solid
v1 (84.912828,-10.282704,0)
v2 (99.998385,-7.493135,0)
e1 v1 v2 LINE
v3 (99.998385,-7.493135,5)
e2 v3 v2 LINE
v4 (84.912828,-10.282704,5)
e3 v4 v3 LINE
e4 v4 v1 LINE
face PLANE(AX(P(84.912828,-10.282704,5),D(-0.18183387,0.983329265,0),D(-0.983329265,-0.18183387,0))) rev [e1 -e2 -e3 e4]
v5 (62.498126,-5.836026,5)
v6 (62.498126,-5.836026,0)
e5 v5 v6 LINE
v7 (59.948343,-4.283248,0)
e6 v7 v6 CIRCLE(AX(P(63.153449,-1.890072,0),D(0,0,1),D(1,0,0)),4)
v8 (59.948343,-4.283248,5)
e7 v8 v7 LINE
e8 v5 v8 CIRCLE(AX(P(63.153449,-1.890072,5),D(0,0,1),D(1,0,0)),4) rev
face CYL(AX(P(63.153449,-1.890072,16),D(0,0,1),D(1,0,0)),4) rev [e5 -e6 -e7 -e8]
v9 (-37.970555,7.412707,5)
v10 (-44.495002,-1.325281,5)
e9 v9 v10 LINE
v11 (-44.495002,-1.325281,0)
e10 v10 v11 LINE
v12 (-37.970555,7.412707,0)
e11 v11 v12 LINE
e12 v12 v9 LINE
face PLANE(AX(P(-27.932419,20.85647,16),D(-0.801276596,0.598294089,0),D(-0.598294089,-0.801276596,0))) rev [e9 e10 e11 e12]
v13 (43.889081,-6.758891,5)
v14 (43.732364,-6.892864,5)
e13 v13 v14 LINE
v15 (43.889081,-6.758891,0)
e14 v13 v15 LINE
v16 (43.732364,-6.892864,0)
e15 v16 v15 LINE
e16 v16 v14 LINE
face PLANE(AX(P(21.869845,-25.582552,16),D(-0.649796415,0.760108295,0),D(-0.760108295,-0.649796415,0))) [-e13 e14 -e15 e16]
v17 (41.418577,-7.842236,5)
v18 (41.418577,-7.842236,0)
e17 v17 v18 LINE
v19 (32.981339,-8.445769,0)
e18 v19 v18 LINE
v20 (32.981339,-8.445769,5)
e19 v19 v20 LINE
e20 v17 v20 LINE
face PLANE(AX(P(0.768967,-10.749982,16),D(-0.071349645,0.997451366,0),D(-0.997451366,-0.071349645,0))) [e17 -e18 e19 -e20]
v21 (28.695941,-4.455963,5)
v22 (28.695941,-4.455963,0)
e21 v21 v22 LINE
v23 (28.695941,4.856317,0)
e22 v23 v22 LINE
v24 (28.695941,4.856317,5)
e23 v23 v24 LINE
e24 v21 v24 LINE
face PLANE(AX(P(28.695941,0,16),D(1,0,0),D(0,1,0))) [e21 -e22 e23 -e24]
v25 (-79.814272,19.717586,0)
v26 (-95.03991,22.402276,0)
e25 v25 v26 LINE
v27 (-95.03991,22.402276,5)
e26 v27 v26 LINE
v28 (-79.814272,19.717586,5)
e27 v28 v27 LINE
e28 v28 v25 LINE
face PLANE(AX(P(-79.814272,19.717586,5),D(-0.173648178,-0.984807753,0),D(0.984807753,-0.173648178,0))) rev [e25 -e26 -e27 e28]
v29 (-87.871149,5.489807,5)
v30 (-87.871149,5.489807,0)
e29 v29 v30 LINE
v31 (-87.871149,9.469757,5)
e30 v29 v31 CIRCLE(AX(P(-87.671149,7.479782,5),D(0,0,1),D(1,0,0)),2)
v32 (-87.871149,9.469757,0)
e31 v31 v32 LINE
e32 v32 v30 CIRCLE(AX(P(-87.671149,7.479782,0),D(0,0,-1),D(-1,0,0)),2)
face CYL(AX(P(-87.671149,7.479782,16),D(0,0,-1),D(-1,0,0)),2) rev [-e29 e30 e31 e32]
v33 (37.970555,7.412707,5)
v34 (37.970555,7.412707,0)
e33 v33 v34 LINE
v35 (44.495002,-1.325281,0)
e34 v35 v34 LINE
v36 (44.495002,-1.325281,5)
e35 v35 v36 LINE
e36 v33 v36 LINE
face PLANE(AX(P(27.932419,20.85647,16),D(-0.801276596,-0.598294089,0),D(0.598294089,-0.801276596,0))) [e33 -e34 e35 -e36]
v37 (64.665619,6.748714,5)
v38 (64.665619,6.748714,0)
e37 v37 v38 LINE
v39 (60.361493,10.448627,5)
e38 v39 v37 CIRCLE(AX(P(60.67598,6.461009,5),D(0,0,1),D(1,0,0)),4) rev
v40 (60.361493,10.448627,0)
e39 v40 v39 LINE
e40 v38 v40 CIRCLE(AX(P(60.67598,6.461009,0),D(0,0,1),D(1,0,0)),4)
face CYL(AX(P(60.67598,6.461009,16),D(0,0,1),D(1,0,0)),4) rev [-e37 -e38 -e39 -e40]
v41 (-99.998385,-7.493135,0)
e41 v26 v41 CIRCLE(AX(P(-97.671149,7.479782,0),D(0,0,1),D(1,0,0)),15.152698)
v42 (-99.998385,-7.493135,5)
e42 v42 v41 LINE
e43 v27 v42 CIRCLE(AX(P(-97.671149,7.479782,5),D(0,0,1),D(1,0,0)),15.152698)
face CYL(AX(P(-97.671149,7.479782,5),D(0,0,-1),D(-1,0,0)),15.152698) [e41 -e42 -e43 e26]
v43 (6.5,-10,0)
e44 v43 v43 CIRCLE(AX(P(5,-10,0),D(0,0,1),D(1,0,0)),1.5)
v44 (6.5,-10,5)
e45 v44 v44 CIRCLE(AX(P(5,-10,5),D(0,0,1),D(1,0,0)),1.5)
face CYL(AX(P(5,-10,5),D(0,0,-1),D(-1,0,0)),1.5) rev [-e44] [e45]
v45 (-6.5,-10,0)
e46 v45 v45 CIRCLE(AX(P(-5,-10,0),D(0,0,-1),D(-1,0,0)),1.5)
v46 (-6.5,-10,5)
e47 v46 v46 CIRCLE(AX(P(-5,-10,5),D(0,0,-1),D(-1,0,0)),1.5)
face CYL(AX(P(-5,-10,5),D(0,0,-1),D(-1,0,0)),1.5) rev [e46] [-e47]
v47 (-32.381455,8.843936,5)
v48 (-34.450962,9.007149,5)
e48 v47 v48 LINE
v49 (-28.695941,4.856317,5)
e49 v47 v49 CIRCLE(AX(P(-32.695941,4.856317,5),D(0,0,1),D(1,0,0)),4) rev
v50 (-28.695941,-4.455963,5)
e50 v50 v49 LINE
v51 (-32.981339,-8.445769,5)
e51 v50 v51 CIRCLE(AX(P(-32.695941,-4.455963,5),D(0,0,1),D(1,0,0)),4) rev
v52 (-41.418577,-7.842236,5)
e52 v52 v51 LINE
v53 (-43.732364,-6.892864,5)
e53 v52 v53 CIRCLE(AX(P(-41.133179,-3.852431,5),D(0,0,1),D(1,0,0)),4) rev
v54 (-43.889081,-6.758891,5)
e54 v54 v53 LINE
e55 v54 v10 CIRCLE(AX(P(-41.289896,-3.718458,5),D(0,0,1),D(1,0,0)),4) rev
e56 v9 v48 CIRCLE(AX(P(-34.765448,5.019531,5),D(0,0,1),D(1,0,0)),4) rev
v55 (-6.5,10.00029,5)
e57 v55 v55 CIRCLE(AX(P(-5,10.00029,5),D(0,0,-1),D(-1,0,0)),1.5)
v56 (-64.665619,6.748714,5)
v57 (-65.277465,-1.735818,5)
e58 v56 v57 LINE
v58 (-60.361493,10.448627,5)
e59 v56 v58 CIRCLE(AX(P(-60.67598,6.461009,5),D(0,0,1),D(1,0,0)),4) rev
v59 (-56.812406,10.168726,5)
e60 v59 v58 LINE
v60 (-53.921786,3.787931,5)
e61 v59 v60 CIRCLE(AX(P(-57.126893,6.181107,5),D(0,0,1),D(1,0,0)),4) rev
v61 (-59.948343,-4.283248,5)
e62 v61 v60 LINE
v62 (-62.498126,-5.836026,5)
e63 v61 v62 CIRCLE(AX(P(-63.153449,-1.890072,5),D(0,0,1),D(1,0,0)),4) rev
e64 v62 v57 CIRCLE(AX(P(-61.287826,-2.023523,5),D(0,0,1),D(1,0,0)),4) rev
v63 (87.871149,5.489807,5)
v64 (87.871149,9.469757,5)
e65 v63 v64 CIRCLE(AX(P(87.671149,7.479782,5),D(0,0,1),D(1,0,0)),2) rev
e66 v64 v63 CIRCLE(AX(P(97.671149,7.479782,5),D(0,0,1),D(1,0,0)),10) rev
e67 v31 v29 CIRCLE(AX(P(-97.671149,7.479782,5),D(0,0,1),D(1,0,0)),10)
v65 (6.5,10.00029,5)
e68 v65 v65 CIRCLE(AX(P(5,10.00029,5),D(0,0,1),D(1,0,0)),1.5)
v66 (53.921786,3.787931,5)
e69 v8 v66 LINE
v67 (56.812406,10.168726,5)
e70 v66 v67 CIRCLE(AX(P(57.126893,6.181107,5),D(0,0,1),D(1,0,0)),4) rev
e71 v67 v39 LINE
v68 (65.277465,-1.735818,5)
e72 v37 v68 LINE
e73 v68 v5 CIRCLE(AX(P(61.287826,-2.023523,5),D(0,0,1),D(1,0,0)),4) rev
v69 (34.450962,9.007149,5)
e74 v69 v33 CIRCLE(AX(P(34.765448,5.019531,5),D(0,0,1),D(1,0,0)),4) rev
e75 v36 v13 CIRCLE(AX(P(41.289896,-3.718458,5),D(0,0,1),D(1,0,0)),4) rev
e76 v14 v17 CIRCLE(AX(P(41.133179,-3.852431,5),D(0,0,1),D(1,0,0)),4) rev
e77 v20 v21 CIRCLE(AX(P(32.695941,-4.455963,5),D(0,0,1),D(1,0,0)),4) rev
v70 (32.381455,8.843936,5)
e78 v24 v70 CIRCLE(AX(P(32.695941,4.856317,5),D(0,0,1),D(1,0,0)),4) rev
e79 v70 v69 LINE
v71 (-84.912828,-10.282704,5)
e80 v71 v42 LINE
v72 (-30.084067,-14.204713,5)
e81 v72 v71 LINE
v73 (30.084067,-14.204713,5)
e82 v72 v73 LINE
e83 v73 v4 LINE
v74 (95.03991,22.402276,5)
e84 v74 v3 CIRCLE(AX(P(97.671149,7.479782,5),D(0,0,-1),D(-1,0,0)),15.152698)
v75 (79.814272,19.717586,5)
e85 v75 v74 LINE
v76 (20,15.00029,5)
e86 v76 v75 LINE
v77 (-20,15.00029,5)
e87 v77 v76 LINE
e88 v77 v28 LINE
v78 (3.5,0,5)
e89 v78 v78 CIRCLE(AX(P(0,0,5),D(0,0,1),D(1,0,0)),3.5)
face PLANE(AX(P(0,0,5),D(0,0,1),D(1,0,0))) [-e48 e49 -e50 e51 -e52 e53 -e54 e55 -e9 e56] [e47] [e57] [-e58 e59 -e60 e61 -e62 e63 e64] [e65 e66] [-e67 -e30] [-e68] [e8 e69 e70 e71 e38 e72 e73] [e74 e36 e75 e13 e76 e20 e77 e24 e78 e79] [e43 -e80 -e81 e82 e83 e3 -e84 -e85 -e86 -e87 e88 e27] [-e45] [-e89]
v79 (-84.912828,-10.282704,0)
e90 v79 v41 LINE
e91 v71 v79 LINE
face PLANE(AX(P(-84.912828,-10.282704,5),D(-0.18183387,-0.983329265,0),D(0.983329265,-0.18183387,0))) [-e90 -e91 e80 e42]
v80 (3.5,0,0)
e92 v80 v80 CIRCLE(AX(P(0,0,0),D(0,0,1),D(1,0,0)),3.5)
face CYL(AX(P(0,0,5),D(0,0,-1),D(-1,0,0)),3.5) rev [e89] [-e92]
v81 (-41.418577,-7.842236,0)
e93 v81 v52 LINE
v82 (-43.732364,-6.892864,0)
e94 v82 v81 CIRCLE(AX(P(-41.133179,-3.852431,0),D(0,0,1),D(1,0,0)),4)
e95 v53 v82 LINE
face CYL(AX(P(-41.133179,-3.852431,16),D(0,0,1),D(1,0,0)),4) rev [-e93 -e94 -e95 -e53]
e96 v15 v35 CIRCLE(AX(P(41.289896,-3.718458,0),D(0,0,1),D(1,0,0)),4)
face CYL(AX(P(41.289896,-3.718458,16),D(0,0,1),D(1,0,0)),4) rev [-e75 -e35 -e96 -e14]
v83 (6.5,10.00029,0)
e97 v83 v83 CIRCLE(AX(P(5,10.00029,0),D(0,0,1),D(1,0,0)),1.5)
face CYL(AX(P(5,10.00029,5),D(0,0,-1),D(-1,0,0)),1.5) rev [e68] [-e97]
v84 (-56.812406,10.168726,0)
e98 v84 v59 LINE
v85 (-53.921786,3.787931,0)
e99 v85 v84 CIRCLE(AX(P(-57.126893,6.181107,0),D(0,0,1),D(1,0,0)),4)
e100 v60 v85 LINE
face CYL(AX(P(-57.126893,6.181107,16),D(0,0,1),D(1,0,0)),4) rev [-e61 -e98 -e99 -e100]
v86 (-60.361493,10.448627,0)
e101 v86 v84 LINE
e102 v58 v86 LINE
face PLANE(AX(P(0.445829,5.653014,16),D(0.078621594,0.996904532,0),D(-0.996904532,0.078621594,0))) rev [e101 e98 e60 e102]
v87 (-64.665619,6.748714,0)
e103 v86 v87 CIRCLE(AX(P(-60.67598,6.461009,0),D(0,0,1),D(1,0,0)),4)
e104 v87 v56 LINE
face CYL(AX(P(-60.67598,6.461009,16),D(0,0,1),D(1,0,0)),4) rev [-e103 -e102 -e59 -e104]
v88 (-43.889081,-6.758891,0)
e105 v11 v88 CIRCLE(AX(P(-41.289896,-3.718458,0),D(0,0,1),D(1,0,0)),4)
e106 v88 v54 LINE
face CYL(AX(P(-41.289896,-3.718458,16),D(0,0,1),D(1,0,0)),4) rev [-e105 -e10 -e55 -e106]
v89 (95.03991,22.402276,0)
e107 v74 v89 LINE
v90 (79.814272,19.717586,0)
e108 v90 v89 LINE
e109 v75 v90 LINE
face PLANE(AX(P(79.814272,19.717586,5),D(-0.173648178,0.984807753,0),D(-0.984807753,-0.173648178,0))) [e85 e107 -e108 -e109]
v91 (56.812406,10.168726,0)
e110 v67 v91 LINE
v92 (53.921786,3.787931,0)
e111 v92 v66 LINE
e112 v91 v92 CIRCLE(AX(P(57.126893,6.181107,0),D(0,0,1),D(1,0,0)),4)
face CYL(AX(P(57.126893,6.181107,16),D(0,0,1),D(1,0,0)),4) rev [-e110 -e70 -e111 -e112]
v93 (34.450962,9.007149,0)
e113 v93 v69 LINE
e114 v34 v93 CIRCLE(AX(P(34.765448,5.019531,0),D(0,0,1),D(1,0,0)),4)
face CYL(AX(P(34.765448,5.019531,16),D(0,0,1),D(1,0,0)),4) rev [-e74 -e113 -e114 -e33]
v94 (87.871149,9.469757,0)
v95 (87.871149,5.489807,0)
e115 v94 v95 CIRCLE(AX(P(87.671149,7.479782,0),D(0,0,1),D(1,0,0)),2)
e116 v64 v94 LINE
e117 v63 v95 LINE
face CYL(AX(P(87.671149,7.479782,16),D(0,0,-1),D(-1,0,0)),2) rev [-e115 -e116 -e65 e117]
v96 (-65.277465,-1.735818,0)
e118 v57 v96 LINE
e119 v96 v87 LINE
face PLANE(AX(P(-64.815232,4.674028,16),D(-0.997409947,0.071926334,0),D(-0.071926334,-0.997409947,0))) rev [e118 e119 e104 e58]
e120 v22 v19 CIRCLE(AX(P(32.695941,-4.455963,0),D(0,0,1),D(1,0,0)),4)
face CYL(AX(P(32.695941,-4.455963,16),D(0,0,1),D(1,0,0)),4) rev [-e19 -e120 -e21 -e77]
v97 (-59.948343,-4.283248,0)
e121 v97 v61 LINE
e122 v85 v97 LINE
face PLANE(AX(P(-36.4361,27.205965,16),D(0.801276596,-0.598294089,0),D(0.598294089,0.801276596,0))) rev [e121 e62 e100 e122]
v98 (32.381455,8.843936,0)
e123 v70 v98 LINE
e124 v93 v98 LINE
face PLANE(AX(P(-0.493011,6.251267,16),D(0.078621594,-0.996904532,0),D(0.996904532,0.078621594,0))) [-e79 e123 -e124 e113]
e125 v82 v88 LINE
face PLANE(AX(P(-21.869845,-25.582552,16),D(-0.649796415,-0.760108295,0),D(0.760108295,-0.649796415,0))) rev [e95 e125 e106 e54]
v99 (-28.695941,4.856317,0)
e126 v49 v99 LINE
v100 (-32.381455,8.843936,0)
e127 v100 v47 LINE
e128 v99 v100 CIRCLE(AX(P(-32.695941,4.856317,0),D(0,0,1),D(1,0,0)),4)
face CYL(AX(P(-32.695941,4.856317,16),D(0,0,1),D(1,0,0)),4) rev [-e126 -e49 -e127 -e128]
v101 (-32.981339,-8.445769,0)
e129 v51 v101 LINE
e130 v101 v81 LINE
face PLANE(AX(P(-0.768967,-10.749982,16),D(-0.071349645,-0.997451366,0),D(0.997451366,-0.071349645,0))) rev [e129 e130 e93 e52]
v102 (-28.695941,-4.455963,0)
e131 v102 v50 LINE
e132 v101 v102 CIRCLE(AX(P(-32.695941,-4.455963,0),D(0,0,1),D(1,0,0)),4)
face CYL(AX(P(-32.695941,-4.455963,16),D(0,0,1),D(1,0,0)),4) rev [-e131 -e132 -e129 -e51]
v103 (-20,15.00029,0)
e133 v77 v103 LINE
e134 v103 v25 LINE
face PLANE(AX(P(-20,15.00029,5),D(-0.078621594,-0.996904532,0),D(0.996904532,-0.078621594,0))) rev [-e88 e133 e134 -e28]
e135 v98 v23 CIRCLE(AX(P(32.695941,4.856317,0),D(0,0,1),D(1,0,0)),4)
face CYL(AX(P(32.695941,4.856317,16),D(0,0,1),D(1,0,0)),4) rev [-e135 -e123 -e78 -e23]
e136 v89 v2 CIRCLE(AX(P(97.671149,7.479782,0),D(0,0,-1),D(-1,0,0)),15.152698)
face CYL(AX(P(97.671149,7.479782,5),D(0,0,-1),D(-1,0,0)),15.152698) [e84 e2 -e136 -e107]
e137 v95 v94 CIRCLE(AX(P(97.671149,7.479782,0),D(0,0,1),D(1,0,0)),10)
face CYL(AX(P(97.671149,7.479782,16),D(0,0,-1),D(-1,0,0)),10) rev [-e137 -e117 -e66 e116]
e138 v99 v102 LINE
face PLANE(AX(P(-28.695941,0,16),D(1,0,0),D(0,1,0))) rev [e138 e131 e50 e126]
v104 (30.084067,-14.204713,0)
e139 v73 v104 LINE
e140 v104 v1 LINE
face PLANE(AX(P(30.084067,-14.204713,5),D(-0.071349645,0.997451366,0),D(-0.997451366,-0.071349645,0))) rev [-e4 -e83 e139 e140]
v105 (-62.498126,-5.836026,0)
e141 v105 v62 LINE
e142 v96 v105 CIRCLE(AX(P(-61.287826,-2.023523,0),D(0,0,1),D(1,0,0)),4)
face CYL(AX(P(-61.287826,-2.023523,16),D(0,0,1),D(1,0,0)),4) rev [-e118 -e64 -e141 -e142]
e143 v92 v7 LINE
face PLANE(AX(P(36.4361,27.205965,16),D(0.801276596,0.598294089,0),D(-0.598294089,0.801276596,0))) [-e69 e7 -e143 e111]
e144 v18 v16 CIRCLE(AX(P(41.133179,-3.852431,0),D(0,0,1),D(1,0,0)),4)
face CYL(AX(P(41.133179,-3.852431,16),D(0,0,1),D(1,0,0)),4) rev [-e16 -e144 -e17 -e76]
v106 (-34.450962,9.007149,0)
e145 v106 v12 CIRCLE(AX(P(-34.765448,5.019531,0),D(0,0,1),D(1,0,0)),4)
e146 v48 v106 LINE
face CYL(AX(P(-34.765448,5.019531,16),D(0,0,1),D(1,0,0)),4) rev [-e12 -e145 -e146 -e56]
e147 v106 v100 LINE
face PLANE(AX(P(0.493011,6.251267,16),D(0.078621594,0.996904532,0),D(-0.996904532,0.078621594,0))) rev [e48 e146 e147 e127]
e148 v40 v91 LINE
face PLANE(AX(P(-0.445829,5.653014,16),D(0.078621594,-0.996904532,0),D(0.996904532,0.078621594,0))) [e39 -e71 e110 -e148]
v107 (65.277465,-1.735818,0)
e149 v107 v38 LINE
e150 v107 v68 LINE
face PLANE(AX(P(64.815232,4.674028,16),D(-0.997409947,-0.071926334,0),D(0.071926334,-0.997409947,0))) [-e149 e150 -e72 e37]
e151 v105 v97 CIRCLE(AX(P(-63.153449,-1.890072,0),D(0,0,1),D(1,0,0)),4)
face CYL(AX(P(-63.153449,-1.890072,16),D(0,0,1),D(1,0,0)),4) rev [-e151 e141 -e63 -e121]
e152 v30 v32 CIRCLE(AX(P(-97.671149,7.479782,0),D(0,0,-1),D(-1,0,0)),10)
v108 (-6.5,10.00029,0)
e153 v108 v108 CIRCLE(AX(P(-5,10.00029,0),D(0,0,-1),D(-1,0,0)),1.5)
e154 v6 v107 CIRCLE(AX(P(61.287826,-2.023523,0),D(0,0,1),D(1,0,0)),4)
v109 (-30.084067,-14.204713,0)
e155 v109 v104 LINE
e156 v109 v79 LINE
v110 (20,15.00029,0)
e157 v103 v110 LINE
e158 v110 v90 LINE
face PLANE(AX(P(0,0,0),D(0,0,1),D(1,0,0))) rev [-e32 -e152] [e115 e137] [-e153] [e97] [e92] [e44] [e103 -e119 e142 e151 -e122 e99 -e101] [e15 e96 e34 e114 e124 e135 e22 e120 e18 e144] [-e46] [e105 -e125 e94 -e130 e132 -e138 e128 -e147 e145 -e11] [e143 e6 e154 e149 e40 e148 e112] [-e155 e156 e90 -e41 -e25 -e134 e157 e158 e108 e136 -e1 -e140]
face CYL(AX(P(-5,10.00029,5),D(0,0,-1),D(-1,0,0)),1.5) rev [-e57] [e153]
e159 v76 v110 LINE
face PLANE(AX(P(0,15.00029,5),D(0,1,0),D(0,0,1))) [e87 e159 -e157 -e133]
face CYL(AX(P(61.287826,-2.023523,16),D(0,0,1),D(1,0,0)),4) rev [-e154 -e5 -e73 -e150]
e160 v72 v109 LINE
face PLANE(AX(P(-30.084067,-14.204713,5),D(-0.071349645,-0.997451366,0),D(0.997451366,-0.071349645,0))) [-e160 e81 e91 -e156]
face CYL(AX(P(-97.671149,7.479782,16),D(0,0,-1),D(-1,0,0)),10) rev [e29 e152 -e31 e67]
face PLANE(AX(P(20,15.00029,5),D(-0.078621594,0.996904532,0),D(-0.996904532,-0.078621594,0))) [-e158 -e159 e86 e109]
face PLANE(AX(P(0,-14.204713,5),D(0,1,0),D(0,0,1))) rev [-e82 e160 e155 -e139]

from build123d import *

# Parameters (mm, degrees)
IZIM1_R                     = 1.5
Y_KSEKLIK_EKSTR_ZYON3_DEPTH = 5
KES_EKSTR_ZYON3_DEPTH       = 16
RADYUS1_R                   = 4
RADYUS1_OF_AYNALAMA1_R      = 4


with BuildPart() as part:
    # Çizim1 → Yükseklik-Ekstrüzyon3 (new body)
    with BuildSketch(Plane.XY):
        with BuildLine():
            Line((0, 15.000289945), (20, 15.000289945))
            Line((20, 15.000289945), (79.814271892, 19.717585574))
            Line((79.814271892, 19.717585574), (95.039910294, 22.402276423))
            ThreePointArc((95.039910294, 22.402276423), (112.619627342, 9.95914701), (99.998384592, -7.493135147))
            Line((99.998384592, -7.493135147), (84.9128284, -10.282704371))
            Line((84.9128284, -10.282704371), (30.084066985, -14.204712795))
            Line((30.084066985, -14.204712795), (0, -14.204712795))
            Line((0, -14.204712795), (0, -3.5))
            ThreePointArc((0, -3.5), (3.5, 0), (0, 3.5))
            Line((0, 3.5), (0, 15.000289945))
        make_face()
        with Locations((5, 10.000289945)):
            Circle(IZIM1_R, mode=Mode.SUBTRACT)
        with Locations((5, -10)):
            Circle(IZIM1_R, mode=Mode.SUBTRACT)
    y_kseklik_ekstr_zyon3 = extrude(amount=Y_KSEKLIK_EKSTR_ZYON3_DEPTH)

    # Çizim2 → Kes-Ekstrüzyon3 (cut)
    with BuildSketch(Plane.XY):
        with BuildLine():
            ThreePointArc((87.871148736, 5.489806807), (107.671148736, 7.479781681), (87.871148736, 9.469756555))
            ThreePointArc((87.871148736, 9.469756555), (85.671148736, 7.479781681), (87.871148736, 5.489806807))
        make_face()
        Polygon((65.565337221, -5.727765324), (64.37597588, 10.765231948), (49.583112015, 9.598582086), (61.257040732, -6.035946189), align=None)
        Polygon((42.731699056, -7.748306299), (46.735341753, -4.32569838), (36.65049886, 9.180616861), (28.695940883, 8.553274918), (28.695940883, -8.752311503), align=None)
    kes_ekstr_zyon3 = extrude(amount=KES_EKSTR_ZYON3_DEPTH, mode=Mode.SUBTRACT)

    # Radyus1
    # the kernel refuses this fillet: 4 mm, written as the material it adds along each edge
    with BuildSketch(Plane(origin=(28.695940883, -8.752311503, 0), x_dir=(0.9974513663147316, 0.07134964496670468, 0), z_dir=(0, 0, 1))) as radyus1_piece_1:
        with BuildLine():
            CenterArc((RADYUS1_R * 1.07408709953, RADYUS1_R), RADYUS1_R, 175.908489963, 94.091510037)
            Line((RADYUS1_R * 0.0766357332147, RADYUS1_R * 1.07134964497), (0, 0))
            Line((0, 0), (RADYUS1_R * 1.07408709953, 0))
        make_face()
    extrude(amount=5)
    with BuildSketch(Plane(origin=(64.37597588, 10.765231948, 0), x_dir=(-0.9969045315308735, -0.0786215938099059, 0), z_dir=(0, 0, 1))) as radyus1_piece_2:
        with BuildLine():
            CenterArc((RADYUS1_R * 1.0067369642, RADYUS1_R), RADYUS1_R, 179.615297698, 90.384702302)
            Line((RADYUS1_R * 0.00675950517271, RADYUS1_R * 1.00671427137), (0, 0))
            Line((0, 0), (RADYUS1_R * 1.0067369642, 0))
        make_face()
    extrude(amount=5)
    with BuildSketch(Plane(origin=(49.583112015, 9.598582086, 0), x_dir=(0.5982940894650635, -0.8012765955094225, 0), z_dir=(0, 0, 1))) as radyus1_piece_3:
        with BuildLine():
            CenterArc((RADYUS1_R * 1.81293545135, RADYUS1_R), RADYUS1_R, 147.761521051, 122.238478949)
            Line((RADYUS1_R * 0.967100347397, RADYUS1_R * 1.53344444595), (0, 0))
            Line((0, 0), (RADYUS1_R * 1.81293545135, 0))
        make_face()
    extrude(amount=5)
    with BuildSketch(Plane(origin=(65.565337221, -5.727765324, 0), x_dir=(-0.9974513663147317, -0.07134964496670451, 0), z_dir=(0, 0, 1))) as radyus1_piece_4:
        with BuildLine():
            CenterArc((RADYUS1_R * 1.0005783418, -RADYUS1_R), RADYUS1_R, 90, 90.033126964)
            Line((RADYUS1_R * 0.000578508947597, -RADYUS1_R * 1.00057817457), (0, 0))
            Line((0, 0), (RADYUS1_R * 1.0005783418, 0))
        make_face()
    extrude(amount=5)
    with BuildSketch(Plane(origin=(46.735341753, -4.32569838, 0), x_dir=(-0.5982940894650634, 0.8012765955094225, 0), z_dir=(0, 0, 1))) as radyus1_piece_5:
        with BuildLine():
            CenterArc((RADYUS1_R * 0.936136482984, RADYUS1_R), RADYUS1_R, 183.778435906, 86.221564094)
            Line((-RADYUS1_R * 0.0616898577771, RADYUS1_R * 0.934101641269), (0, 0))
            Line((0, 0), (RADYUS1_R * 0.936136482984, 0))
        make_face()
    extrude(amount=5)
    with BuildSketch(Plane(origin=(36.65049886, 9.180616861, 0), x_dir=(-0.9969045315308735, -0.07862159380990552, 0), z_dir=(0, 0, 1))) as radyus1_piece_6:
        with BuildLine():
            CenterArc((RADYUS1_R * 0.551591618585, RADYUS1_R), RADYUS1_R, 212.238478949, 57.761521051)
            Line((-RADYUS1_R * 0.294243485369, RADYUS1_R * 0.466555554046), (0, 0))
            Line((0, 0), (RADYUS1_R * 0.551591618585, 0))
        make_face()
    extrude(amount=5)
    with BuildSketch(Plane(origin=(28.695940883, 8.553274918, 0), x_dir=(0, -1, 0), z_dir=(0, 0, 1))) as radyus1_piece_7:
        with BuildLine():
            CenterArc((RADYUS1_R * 0.924239359987, RADYUS1_R), RADYUS1_R, 184.509339304, 85.490660696)
            Line((-RADYUS1_R * 0.072665171544, RADYUS1_R * 0.92137840619), (0, 0))
            Line((0, 0), (RADYUS1_R * 0.924239359987, 0))
        make_face()
    extrude(amount=5)
    with BuildSketch(Plane(origin=(42.731699056, -7.748306299, 0), x_dir=(-0.9974513663147319, -0.07134964496670451, 0), z_dir=(0, 0, 1))) as radyus1_piece_8:
        with BuildLine():
            CenterArc((RADYUS1_R * 0.32911927964, -RADYUS1_R), RADYUS1_R, 90, 36.434744123)
            Line((-RADYUS1_R * 0.26478758489, -RADYUS1_R * 0.195466199427), (0, 0))
            Line((0, 0), (RADYUS1_R * 0.32911927964, 0))
        make_face()
    extrude(amount=5)
    with BuildSketch(Plane(origin=(61.257040732, -6.035946189, 0), x_dir=(0.9974513663147319, 0.07134964496670383, 0), z_dir=(0, 0, 1))) as radyus1_piece_9:
        with BuildLine():
            CenterArc((RADYUS1_R * 0.546845511805, RADYUS1_R), RADYUS1_R, 212.656308216, 57.343691784)
            Line((-RADYUS1_R * 0.295076994051, RADYUS1_R * 0.460401543615), (0, 0))
            Line((0, 0), (RADYUS1_R * 0.546845511805, 0))
        make_face()
    extrude(amount=5)

    # Aynalama1: Yükseklik-Ekstrüzyon3, Kes-Ekstrüzyon3 across plane
    add(y_kseklik_ekstr_zyon3.mirror(Plane(origin=(0, 0, 0), x_dir=(0, 0, 1), z_dir=(1, 0, 0))))
    add(kes_ekstr_zyon3.mirror(Plane(origin=(0, 0, 0), x_dir=(0, 0, 1), z_dir=(1, 0, 0))), mode=Mode.SUBTRACT)

    # Radyus1 of Aynalama1
    # the kernel refuses this fillet: 4 mm, written as the material it adds along each edge
    with BuildSketch(Plane(origin=(-28.695940883, -8.752311503, 0), x_dir=(0, 1, 0), z_dir=(0, 0, 1))) as radyus1_of_aynalama1_piece_1:
        with BuildLine():
            CenterArc((RADYUS1_OF_AYNALAMA1_R * 1.07408709953, RADYUS1_OF_AYNALAMA1_R), RADYUS1_OF_AYNALAMA1_R, 175.908489963, 94.091510037)
            Line((RADYUS1_OF_AYNALAMA1_R * 0.0766357332147, RADYUS1_OF_AYNALAMA1_R * 1.07134964497), (0, 0))
            Line((0, 0), (RADYUS1_OF_AYNALAMA1_R * 1.07408709953, 0))
        make_face()
    extrude(amount=5)
    with BuildSketch(Plane(origin=(-64.37597588, 10.765231948, 0), x_dir=(-0.0719263340510189, -0.9974099470478431, 0), z_dir=(0, 0, 1))) as radyus1_of_aynalama1_piece_2:
        with BuildLine():
            CenterArc((RADYUS1_OF_AYNALAMA1_R * 1.0067369642, RADYUS1_OF_AYNALAMA1_R), RADYUS1_OF_AYNALAMA1_R, 179.615297698, 90.384702302)
            Line((RADYUS1_OF_AYNALAMA1_R * 0.00675950517271, RADYUS1_OF_AYNALAMA1_R * 1.00671427137), (0, 0))
            Line((0, 0), (RADYUS1_OF_AYNALAMA1_R * 1.0067369642, 0))
        make_face()
    extrude(amount=5)
    with BuildSketch(Plane(origin=(-49.583112015, 9.598582086, 0), x_dir=(-0.9969045315308733, 0.07862159380990602, 0), z_dir=(0, 0, 1))) as radyus1_of_aynalama1_piece_3:
        with BuildLine():
            CenterArc((RADYUS1_OF_AYNALAMA1_R * 1.81293545135, RADYUS1_OF_AYNALAMA1_R), RADYUS1_OF_AYNALAMA1_R, 147.761521051, 122.238478949)
            Line((RADYUS1_OF_AYNALAMA1_R * 0.967100347397, RADYUS1_OF_AYNALAMA1_R * 1.53344444595), (0, 0))
            Line((0, 0), (RADYUS1_OF_AYNALAMA1_R * 1.81293545135, 0))
        make_face()
    extrude(amount=5)
    with BuildSketch(Plane(origin=(-65.565337221, -5.727765324, 0), x_dir=(0.07192633405101899, 0.9974099470478431, 0), z_dir=(0, 0, 1))) as radyus1_of_aynalama1_piece_4:
        with BuildLine():
            CenterArc((RADYUS1_OF_AYNALAMA1_R * 1.0005783418, -RADYUS1_OF_AYNALAMA1_R), RADYUS1_OF_AYNALAMA1_R, 90, 90.033126964)
            Line((RADYUS1_OF_AYNALAMA1_R * 0.000578508947597, -RADYUS1_OF_AYNALAMA1_R * 1.00057817457), (0, 0))
            Line((0, 0), (RADYUS1_OF_AYNALAMA1_R * 1.0005783418, 0))
        make_face()
    extrude(amount=5)
    with BuildSketch(Plane(origin=(-46.735341753, -4.32569838, 0), x_dir=(0.7601082947002413, -0.6497964145237269, 0), z_dir=(0, 0, 1))) as radyus1_of_aynalama1_piece_5:
        with BuildLine():
            CenterArc((RADYUS1_OF_AYNALAMA1_R * 0.936136482984, RADYUS1_OF_AYNALAMA1_R), RADYUS1_OF_AYNALAMA1_R, 183.778435906, 86.221564094)
            Line((-RADYUS1_OF_AYNALAMA1_R * 0.0616898577771, RADYUS1_OF_AYNALAMA1_R * 0.934101641269), (0, 0))
            Line((0, 0), (RADYUS1_OF_AYNALAMA1_R * 0.936136482984, 0))
        make_face()
    extrude(amount=5)
    with BuildSketch(Plane(origin=(-36.65049886, 9.180616861, 0), x_dir=(-0.5982940894650631, -0.8012765955094229, 0), z_dir=(0, 0, 1))) as radyus1_of_aynalama1_piece_6:
        with BuildLine():
            CenterArc((RADYUS1_OF_AYNALAMA1_R * 0.551591618585, RADYUS1_OF_AYNALAMA1_R), RADYUS1_OF_AYNALAMA1_R, 212.238478949, 57.761521051)
            Line((-RADYUS1_OF_AYNALAMA1_R * 0.294243485369, RADYUS1_OF_AYNALAMA1_R * 0.466555554046), (0, 0))
            Line((0, 0), (RADYUS1_OF_AYNALAMA1_R * 0.551591618585, 0))
        make_face()
    extrude(amount=5)
    with BuildSketch(Plane(origin=(-28.695940883, 8.553274918, 0), x_dir=(-0.9969045315308733, 0.07862159380990584, 0), z_dir=(0, 0, 1))) as radyus1_of_aynalama1_piece_7:
        with BuildLine():
            CenterArc((RADYUS1_OF_AYNALAMA1_R * 0.924239359987, RADYUS1_OF_AYNALAMA1_R), RADYUS1_OF_AYNALAMA1_R, 184.509339304, 85.490660696)
            Line((-RADYUS1_OF_AYNALAMA1_R * 0.072665171544, RADYUS1_OF_AYNALAMA1_R * 0.92137840619), (0, 0))
            Line((0, 0), (RADYUS1_OF_AYNALAMA1_R * 0.924239359987, 0))
        make_face()
    extrude(amount=5)
    with BuildSketch(Plane(origin=(-42.731699056, -7.748306299, 0), x_dir=(-0.7601082947002398, 0.6497964145237288, 0), z_dir=(0, 0, 1))) as radyus1_of_aynalama1_piece_8:
        with BuildLine():
            CenterArc((RADYUS1_OF_AYNALAMA1_R * 0.32911927964, -RADYUS1_OF_AYNALAMA1_R), RADYUS1_OF_AYNALAMA1_R, 90, 36.434744123)
            Line((-RADYUS1_OF_AYNALAMA1_R * 0.26478758489, -RADYUS1_OF_AYNALAMA1_R * 0.195466199427), (0, 0))
            Line((0, 0), (RADYUS1_OF_AYNALAMA1_R * 0.32911927964, 0))
        make_face()
    extrude(amount=5)
    with BuildSketch(Plane(origin=(-61.257040732, -6.035946189, 0), x_dir=(0.5982940894650624, 0.8012765955094232, 0), z_dir=(0, 0, 1))) as radyus1_of_aynalama1_piece_9:
        with BuildLine():
            CenterArc((RADYUS1_OF_AYNALAMA1_R * 0.546845511805, RADYUS1_OF_AYNALAMA1_R), RADYUS1_OF_AYNALAMA1_R, 212.656308216, 57.343691784)
            Line((-RADYUS1_OF_AYNALAMA1_R * 0.295076994051, RADYUS1_OF_AYNALAMA1_R * 0.460401543615), (0, 0))
            Line((0, 0), (RADYUS1_OF_AYNALAMA1_R * 0.546845511805, 0))
        make_face()
    extrude(amount=5)


solid = part.part
